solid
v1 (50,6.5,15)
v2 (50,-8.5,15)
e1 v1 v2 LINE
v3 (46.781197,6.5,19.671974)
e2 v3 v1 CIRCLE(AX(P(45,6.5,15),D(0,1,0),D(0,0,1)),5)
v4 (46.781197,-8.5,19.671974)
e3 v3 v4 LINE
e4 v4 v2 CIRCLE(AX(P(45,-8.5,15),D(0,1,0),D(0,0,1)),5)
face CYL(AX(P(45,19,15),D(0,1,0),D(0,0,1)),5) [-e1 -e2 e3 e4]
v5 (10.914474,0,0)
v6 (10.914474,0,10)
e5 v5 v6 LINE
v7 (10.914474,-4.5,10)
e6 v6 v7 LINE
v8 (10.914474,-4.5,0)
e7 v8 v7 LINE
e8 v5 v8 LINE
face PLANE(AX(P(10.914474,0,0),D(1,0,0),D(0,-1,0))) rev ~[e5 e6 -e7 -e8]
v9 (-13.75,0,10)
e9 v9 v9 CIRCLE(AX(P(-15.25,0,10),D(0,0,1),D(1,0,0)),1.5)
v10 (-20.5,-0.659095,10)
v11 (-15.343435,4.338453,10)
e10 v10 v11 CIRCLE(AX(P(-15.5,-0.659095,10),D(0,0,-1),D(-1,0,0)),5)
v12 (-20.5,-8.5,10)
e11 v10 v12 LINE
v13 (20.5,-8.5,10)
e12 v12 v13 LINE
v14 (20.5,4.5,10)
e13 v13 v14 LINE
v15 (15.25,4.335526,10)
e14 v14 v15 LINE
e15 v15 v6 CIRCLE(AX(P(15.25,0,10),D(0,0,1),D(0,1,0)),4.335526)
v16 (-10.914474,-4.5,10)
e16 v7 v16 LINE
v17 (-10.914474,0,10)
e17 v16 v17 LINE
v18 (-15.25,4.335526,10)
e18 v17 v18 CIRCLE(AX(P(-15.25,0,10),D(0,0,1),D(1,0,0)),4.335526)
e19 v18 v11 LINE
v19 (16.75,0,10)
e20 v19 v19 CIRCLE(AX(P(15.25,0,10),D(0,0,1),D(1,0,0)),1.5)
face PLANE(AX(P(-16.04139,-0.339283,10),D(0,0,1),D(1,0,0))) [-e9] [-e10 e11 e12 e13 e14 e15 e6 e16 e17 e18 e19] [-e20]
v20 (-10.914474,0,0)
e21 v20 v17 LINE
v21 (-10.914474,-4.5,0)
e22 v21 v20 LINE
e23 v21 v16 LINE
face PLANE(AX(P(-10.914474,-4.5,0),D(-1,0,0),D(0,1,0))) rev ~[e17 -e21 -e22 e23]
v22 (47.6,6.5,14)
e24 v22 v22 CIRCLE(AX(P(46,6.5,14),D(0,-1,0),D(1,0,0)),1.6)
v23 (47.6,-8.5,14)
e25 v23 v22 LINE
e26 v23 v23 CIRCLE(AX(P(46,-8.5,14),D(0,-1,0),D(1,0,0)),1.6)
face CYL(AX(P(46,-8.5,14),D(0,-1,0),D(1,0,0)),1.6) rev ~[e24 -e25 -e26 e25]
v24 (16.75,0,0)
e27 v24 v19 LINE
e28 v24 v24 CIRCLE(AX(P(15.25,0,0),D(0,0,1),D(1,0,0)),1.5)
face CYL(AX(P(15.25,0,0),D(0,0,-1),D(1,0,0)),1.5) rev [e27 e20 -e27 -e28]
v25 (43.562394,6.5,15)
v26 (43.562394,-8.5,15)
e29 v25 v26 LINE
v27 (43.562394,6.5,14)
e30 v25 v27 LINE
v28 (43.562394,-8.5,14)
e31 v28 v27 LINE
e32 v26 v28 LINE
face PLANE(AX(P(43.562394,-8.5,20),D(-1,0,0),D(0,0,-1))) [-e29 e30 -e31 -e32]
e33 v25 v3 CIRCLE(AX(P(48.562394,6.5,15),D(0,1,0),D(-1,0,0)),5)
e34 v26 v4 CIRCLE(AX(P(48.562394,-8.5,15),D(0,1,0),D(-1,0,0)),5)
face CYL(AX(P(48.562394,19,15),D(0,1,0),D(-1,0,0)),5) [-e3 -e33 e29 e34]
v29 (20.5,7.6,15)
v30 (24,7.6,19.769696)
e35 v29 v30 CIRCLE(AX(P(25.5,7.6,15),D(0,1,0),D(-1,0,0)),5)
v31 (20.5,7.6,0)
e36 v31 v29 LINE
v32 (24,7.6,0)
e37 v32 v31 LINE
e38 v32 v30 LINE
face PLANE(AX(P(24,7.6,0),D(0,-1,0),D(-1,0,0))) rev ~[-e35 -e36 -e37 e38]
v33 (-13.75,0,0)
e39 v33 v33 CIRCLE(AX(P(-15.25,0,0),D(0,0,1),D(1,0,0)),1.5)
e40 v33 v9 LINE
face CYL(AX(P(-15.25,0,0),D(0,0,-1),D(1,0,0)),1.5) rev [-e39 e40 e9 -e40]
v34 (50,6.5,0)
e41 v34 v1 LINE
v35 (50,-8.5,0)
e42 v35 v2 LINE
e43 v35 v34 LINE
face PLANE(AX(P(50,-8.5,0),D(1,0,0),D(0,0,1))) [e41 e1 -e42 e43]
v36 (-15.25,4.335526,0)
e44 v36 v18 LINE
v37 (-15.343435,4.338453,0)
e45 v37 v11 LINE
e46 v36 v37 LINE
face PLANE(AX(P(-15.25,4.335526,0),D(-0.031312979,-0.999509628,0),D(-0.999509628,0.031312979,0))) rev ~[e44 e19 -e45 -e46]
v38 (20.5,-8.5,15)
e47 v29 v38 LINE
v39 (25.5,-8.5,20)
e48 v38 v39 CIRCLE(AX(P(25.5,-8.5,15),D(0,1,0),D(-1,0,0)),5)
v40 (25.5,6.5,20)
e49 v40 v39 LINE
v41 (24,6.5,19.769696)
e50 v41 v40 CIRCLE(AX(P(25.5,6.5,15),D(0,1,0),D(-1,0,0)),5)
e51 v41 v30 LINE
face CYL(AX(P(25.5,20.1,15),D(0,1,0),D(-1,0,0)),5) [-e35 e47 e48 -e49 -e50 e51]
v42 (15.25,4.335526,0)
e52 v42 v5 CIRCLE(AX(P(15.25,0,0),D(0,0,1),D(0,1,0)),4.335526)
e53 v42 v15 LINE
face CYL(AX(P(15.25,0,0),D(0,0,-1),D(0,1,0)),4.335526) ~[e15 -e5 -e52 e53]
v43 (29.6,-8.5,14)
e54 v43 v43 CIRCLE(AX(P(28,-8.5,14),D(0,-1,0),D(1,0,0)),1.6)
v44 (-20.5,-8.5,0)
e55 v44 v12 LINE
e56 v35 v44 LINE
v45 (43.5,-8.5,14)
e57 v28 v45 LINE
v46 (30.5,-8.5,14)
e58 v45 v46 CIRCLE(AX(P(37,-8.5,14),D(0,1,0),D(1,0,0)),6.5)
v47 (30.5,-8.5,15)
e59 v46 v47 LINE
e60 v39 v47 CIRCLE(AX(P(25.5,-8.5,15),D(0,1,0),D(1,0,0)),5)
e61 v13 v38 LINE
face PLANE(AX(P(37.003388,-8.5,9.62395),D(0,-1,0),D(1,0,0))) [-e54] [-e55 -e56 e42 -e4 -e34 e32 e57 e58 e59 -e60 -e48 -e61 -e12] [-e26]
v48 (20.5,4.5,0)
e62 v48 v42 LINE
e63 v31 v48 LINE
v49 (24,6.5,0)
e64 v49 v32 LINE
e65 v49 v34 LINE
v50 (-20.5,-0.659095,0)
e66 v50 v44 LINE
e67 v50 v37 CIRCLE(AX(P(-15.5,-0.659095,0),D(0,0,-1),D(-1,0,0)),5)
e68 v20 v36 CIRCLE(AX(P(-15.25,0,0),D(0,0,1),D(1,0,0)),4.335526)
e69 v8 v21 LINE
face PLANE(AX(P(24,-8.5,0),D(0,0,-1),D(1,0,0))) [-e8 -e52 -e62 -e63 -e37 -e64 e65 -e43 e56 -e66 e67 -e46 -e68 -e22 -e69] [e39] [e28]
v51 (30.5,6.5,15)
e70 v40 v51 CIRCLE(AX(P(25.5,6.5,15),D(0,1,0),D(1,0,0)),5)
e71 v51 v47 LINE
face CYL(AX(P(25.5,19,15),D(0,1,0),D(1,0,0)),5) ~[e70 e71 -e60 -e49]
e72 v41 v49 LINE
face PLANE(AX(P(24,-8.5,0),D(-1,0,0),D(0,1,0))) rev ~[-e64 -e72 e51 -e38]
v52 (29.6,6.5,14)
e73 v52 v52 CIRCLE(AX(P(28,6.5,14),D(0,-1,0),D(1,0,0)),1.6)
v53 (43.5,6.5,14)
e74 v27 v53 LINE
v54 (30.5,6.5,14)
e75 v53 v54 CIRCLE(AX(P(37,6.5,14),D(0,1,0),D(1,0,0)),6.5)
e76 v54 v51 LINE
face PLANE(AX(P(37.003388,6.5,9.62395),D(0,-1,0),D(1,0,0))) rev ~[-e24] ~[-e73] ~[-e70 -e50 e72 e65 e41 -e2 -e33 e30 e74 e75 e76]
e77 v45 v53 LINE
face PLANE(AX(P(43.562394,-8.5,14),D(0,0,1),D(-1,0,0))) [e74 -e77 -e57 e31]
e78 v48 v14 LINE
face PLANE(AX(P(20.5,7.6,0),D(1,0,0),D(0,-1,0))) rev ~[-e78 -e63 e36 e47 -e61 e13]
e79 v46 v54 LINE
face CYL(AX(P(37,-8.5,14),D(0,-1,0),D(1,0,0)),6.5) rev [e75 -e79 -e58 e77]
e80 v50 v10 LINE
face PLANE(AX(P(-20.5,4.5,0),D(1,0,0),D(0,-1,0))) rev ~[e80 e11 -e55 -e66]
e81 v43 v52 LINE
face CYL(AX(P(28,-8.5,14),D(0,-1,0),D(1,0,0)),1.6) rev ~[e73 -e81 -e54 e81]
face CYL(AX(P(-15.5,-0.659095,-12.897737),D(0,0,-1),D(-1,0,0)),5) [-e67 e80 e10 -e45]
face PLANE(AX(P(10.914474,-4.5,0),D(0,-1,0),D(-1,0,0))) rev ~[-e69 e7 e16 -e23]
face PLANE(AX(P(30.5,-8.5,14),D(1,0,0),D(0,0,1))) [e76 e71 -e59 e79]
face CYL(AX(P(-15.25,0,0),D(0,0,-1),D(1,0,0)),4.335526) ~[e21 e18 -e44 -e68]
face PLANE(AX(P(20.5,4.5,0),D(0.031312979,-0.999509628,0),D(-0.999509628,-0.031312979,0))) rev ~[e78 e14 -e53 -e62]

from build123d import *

# Parameters (mm, degrees)
F0_R        = 1.5
F1_DEPTH    = 10
F2_DEPTH    = 20
F4_R        = 1.6
F5_DEPTH    = 15
F6_T1_DEPTH = 40
F6_T3_DEPTH = 41.1
F6_T5_DEPTH = 35.7954738485


# Not quite as in the source:
# - a fillet or chamfer that OpenCascade refuses, or shapes differently, is made with other operations: its cross-section is extruded or revolved along the edge and cut away or added


with BuildPart() as f1:
    # F0 (on Top) → F1 (new body)
    with BuildSketch(Plane.XY):
        with BuildLine():
            Line((-15.25, 4.3355262056), (-20.5, 4.5))
            Line((-20.5, 4.5), (-20.5, -4.5))
            Line((-20.5, -4.5), (-10.9144737944, -4.5))
            Line((-10.9144737944, -4.5), (-10.9144737944, 0))
            ThreePointArc((-10.9144737944, 0), (-12.18432002, 3.06567998), (-15.25, 4.3355262056))
        make_face()
        with Locations((-15.25, 0)):
            Circle(F0_R, mode=Mode.SUBTRACT)
        Polygon((20.5, -8.5), (20.5, -4.5), (10.9144737944, -4.5), (-10.9144737944, -4.5), (-20.5, -4.5), (-20.5, -8.5), align=None)
        with BuildLine():
            Line((20.5, -4.5), (20.5, 4.5))
            Line((20.5, 4.5), (15.25, 4.3355262056))
            ThreePointArc((15.25, 4.3355262056), (12.18432002, 3.06567998), (10.9144737944, 0))
            Line((10.9144737944, 0), (10.9144737944, -4.5))
            Line((10.9144737944, -4.5), (20.5, -4.5))
        make_face()
        with Locations((15.25, 0)):
            Circle(F0_R, mode=Mode.SUBTRACT)
    extrude(amount=F1_DEPTH)


with BuildPart() as f2:
    # F0 (on Top) → F2 (new body)
    with BuildSketch(Plane.XY):
        Polygon((20.5, 7.6), (20.5, 4.5), (20.5, -4.5), (20.5, -8.5), (24, -8.5), (24, 0), (24, 7.6), align=None)
    extrude(amount=F2_DEPTH)


with BuildPart() as f1_1:
    add(f1.part)

    # F3: union F2
    add(f2.part)

    # F4 (on face) → F5 (join)
    with BuildSketch(Plane.XZ.offset(8.5)):
        with BuildLine():
            Line((24, 14), (24, 0))
            Line((24, 0), (50, 0))
            Line((50, 0), (50, 14))
            Line((50, 14), (50, 20))
            Line((50, 20), (43.5623936355, 20))
            Line((43.5623936355, 20), (43.5623936355, 14))
            Line((43.5623936355, 14), (43.5, 14))
            ThreePointArc((43.5, 14), (37, 7.5), (30.5, 14))
            Line((30.5, 14), (30.5, 20))
            Line((30.5, 20), (24, 20))
            Line((24, 20), (24, 14))
        make_face()
        with Locations((28, 14)):
            Circle(F4_R, mode=Mode.SUBTRACT)
        with Locations((46, 14)):
            Circle(F4_R, mode=Mode.SUBTRACT)
    extrude(amount=-F5_DEPTH)

    # F6: fillet of radius 5 on 5 edges, made by hand

    # F6_s2 → F6_t1 (cut)
    with BuildSketch(Plane.XZ.offset(-19)):
        with BuildLine():
            ThreePointArc((43.5623936355, 15), (45.0268597296, 18.5355339059), (48.5623936355, 20))
            Line((48.5623936355, 20), (43.5623936355, 20))
            Line((43.5623936355, 20), (43.5623936355, 15))
        make_face()
        with BuildLine():
            ThreePointArc((45, 20), (48.5355339059, 18.5355339059), (50, 15))
            Line((50, 15), (50, 20))
            Line((50, 20), (45, 20))
        make_face()
        with BuildLine():
            ThreePointArc((30.5, 15), (29.0355339059, 18.5355339059), (25.5, 20))
            Line((25.5, 20), (30.5, 20))
            Line((30.5, 20), (30.5, 15))
        make_face()
    extrude(amount=F6_T1_DEPTH, mode=Mode.SUBTRACT)

    # F6_s4 → F6_t3 (cut)
    with BuildSketch(Plane.XZ.offset(-20.1)):
        with BuildLine():
            ThreePointArc((20.5, 15), (21.9644660941, 18.5355339059), (25.5, 20))
            Line((25.5, 20), (20.5, 20))
            Line((20.5, 20), (20.5, 15))
        make_face()
    extrude(amount=F6_T3_DEPTH, mode=Mode.SUBTRACT)

    # F6_s6 → F6_t5 (cut)
    with BuildSketch(Plane.XY.offset(-12.8977369243)):
        with BuildLine():
            ThreePointArc((-20.5, -0.6590947697), (-18.9797396108, 2.9313665155), (-15.3434351037, 4.3384533725))
            Line((-15.3434351037, 4.3384533725), (-20.5, 4.5))
            Line((-20.5, 4.5), (-20.5, -0.6590947697))
        make_face()
    extrude(amount=F6_T5_DEPTH, mode=Mode.SUBTRACT)


solid = f1_1.part
